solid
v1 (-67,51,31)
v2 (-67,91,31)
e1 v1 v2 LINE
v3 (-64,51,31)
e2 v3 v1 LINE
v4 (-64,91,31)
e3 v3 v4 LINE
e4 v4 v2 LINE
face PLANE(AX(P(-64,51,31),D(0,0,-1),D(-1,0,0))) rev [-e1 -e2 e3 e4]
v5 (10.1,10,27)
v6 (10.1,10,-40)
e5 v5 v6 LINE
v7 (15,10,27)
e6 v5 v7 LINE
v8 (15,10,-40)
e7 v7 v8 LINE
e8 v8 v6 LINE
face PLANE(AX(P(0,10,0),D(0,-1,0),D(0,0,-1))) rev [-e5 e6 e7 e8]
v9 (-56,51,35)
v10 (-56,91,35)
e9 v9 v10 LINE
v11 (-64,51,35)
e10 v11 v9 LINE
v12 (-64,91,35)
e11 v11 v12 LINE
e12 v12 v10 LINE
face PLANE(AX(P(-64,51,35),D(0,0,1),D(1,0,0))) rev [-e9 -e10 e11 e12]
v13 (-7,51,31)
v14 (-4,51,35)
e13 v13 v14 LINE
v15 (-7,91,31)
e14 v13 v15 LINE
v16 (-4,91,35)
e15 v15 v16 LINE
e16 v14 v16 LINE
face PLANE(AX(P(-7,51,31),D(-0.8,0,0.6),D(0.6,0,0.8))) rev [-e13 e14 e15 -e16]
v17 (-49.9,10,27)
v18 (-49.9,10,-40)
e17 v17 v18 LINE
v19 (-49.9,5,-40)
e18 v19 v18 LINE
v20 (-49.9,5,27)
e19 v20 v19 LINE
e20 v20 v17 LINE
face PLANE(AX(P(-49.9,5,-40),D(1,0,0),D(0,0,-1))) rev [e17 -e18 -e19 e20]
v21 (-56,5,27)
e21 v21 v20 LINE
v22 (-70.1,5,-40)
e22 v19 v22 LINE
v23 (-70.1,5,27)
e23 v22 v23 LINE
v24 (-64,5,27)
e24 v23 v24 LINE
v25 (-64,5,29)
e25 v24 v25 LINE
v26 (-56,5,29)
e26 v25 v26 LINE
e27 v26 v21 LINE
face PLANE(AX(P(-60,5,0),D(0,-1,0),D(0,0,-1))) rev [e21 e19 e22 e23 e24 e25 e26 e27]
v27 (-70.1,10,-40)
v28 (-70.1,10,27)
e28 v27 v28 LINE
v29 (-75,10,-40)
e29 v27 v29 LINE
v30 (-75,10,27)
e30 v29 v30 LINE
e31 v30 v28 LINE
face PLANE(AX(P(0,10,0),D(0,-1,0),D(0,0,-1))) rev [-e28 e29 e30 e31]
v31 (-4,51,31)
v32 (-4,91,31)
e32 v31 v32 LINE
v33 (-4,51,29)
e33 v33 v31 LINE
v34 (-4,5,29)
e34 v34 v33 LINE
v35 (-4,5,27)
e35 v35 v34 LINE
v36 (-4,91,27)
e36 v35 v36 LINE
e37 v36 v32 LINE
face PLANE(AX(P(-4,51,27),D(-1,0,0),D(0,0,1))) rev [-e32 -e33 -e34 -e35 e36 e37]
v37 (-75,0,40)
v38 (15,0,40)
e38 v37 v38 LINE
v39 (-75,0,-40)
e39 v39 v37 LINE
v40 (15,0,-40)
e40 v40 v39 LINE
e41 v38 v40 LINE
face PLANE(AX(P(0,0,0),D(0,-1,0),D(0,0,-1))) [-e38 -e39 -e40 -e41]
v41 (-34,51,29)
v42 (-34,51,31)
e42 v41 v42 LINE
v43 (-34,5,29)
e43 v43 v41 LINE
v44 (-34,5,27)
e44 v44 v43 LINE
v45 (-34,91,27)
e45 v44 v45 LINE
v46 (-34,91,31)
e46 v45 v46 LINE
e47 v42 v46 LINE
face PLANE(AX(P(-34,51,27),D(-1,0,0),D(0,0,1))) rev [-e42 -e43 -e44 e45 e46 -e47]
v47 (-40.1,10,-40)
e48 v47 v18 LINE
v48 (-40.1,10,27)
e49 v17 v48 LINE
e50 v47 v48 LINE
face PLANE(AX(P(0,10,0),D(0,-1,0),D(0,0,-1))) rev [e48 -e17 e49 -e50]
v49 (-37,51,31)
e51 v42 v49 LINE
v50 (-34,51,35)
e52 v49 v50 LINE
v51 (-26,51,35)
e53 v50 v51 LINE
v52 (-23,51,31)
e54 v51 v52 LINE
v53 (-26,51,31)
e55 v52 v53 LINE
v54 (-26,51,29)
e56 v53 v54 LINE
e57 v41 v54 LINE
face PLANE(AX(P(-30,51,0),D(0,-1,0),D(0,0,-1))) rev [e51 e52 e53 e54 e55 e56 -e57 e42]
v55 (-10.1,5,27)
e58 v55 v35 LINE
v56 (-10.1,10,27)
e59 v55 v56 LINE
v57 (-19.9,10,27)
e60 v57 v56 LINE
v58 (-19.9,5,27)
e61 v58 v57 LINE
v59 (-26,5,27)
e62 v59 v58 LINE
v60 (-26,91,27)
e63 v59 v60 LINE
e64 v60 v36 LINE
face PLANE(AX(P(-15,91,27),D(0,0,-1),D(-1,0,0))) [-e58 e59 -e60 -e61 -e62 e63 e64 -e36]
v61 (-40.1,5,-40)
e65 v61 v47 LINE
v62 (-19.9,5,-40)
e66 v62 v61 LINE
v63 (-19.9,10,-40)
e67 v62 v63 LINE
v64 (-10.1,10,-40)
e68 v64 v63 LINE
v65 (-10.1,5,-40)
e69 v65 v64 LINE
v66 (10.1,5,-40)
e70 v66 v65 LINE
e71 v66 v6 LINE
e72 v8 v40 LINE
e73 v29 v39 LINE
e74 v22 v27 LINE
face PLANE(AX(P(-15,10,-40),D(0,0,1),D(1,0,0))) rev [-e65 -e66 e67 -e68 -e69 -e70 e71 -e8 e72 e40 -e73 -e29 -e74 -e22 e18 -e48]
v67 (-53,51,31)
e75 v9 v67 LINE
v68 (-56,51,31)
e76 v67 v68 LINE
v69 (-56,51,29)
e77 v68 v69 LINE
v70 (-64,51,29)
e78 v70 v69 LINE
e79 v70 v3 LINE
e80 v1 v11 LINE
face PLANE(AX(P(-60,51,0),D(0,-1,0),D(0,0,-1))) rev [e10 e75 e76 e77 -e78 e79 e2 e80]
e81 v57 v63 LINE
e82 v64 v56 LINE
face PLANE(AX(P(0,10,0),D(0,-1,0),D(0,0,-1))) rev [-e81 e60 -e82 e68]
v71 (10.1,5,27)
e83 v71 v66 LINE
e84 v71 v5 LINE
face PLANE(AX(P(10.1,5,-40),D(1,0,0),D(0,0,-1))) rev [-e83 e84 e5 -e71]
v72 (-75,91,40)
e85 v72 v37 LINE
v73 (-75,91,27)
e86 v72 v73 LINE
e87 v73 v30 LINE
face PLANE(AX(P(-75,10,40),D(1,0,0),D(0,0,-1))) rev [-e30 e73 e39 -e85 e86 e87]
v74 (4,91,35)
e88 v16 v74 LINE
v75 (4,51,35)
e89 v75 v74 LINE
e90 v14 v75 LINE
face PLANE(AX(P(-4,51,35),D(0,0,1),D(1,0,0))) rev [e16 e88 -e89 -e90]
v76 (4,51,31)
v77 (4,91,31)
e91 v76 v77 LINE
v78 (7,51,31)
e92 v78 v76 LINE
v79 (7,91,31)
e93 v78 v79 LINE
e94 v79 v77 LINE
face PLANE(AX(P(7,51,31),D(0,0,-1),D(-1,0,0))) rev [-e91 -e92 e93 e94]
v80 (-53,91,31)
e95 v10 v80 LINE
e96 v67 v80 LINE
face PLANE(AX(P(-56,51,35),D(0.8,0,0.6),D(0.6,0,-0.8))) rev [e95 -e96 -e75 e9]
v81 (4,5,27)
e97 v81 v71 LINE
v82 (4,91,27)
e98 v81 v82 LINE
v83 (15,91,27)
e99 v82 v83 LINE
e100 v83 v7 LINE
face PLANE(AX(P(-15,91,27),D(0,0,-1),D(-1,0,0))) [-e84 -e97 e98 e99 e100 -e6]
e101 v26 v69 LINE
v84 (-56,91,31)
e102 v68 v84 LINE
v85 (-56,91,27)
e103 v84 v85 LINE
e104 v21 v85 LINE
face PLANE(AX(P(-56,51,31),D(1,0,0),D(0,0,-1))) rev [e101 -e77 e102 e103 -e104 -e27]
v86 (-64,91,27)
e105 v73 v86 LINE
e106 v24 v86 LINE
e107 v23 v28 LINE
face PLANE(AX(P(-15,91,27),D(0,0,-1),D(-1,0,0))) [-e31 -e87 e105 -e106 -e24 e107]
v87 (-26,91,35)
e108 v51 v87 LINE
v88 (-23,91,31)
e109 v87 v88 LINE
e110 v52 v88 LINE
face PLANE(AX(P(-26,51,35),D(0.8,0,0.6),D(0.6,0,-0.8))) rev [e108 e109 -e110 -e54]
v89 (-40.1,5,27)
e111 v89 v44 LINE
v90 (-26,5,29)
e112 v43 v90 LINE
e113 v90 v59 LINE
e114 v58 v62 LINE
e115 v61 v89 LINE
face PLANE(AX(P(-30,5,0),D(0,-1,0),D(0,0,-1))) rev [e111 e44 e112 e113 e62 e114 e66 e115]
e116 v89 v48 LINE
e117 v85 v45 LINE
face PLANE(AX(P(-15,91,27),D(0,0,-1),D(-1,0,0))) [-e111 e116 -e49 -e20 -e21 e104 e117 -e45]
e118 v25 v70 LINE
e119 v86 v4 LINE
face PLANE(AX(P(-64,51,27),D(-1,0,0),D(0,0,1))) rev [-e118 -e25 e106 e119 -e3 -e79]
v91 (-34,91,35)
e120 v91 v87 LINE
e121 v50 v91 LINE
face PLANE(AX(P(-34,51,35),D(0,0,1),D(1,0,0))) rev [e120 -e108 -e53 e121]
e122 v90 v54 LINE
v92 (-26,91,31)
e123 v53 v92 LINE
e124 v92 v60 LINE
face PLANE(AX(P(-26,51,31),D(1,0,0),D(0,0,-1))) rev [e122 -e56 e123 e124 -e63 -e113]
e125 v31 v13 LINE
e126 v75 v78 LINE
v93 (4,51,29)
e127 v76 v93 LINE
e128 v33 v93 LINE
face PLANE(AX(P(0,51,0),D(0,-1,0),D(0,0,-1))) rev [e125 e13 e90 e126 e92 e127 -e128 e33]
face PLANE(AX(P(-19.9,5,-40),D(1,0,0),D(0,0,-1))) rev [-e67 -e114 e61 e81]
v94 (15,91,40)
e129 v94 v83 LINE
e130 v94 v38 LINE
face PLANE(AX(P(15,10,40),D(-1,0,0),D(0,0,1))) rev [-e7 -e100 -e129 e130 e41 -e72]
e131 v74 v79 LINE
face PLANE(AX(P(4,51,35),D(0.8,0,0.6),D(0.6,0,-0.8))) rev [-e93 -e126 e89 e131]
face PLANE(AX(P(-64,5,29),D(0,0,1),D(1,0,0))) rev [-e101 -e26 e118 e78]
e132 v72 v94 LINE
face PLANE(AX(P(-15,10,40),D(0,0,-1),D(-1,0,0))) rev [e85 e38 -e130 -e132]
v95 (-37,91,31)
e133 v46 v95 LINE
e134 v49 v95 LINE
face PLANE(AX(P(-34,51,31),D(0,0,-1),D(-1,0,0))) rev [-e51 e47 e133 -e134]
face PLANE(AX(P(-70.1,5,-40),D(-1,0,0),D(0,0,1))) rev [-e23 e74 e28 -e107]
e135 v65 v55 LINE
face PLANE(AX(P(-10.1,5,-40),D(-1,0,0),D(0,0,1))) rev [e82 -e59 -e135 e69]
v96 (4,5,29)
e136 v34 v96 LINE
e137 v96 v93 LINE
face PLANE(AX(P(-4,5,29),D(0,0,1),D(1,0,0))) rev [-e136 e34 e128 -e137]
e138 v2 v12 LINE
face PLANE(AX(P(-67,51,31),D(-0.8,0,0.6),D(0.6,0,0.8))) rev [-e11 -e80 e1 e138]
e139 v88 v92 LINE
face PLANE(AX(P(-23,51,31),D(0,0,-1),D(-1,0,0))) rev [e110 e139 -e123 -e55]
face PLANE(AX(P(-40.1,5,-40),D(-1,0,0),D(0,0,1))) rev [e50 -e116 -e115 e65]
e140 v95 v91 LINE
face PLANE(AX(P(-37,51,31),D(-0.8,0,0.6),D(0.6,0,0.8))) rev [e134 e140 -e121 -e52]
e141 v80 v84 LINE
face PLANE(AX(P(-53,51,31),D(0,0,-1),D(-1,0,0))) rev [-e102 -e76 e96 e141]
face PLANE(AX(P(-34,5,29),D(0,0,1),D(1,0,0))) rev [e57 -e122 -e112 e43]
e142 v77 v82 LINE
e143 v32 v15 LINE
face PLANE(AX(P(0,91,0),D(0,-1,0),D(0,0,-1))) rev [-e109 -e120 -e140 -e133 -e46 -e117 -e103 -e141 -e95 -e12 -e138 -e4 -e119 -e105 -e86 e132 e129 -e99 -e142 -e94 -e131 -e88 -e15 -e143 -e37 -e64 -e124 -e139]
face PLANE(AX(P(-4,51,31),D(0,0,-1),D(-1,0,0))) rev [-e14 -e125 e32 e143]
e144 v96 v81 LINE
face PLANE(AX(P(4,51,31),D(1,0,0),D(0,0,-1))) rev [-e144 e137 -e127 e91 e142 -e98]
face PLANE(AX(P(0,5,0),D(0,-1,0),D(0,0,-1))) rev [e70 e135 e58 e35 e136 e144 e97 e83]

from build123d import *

# Parameters (mm, degrees)
SKETCH1_W           = 30
SKETCH1_H           = 80
BOSS_EXTRUDE1_DEPTH = 10
SKETCH2_W           = 30
SKETCH2_H           = 13
BOSS_EXTRUDE2_DEPTH = 81
CUT_EXTRUDE1_DEPTH  = 40
SKETCH4_W           = 20.2
SKETCH4_H           = 67
CUT_EXTRUDE2_DEPTH  = 5
SKETCH5_W           = 8
SKETCH5_H           = 2
CUT_EXTRUDE3_DEPTH  = 46
LPATTERN1_COUNT     = 3
LPATTERN1_PITCH     = 30


with BuildPart() as part:
    # Sketch1 → Boss-Extrude1 (new body)
    with BuildSketch(Plane(origin=(0, 0, 0), x_dir=(1, 0, 0), z_dir=(0, 1, 0))):
        Rectangle(SKETCH1_W, SKETCH1_H)
    boss_extrude1 = extrude(amount=BOSS_EXTRUDE1_DEPTH)

    # Sketch2 → Boss-Extrude2 (add)
    with BuildSketch(Plane(origin=(0, 10, 0), x_dir=(1, 0, 0), z_dir=(0, 1, 0))):
        with Locations((0, -33.5)):
            Rectangle(SKETCH2_W, SKETCH2_H)
    boss_extrude2 = extrude(amount=BOSS_EXTRUDE2_DEPTH)

    # Sketch3 → Cut-Extrude1 (cut)
    with BuildSketch(Plane(origin=(0, 91, 0), x_dir=(1, 0, 0), z_dir=(0, 1, 0))):
        Polygon((-4, -27), (4, -27), (4, -31), (7, -31), (4, -35), (-4, -35), (-7, -31), (-4, -31), align=None)
    cut_extrude1 = extrude(amount=-CUT_EXTRUDE1_DEPTH, mode=Mode.SUBTRACT)

    # Sketch4 → Cut-Extrude2 (cut)
    with BuildSketch(Plane(origin=(0, 10, 0), x_dir=(1, 0, 0), z_dir=(0, 1, 0))):
        with Locations((0, 6.5)):
            Rectangle(SKETCH4_W, SKETCH4_H)
    cut_extrude2 = extrude(amount=-CUT_EXTRUDE2_DEPTH, mode=Mode.SUBTRACT)

    # Sketch5 → Cut-Extrude3 (cut)
    with BuildSketch(Plane(origin=(0, 51, 0), x_dir=(1, 0, 0), z_dir=(0, 1, 0))):
        with Locations((0, -28)):
            Rectangle(SKETCH5_W, SKETCH5_H)
    cut_extrude3 = extrude(amount=-CUT_EXTRUDE3_DEPTH, mode=Mode.SUBTRACT)

    # LPattern1: Boss-Extrude1, Boss-Extrude2, Cut-Extrude1, Cut-Extrude2, Cut-Extrude3 ×3
    with Locations(*[(-i * LPATTERN1_PITCH, 0, 0) for i in range(1, LPATTERN1_COUNT)]):
        add(boss_extrude1)
        add(boss_extrude2)
        add(cut_extrude1, mode=Mode.SUBTRACT)
        add(cut_extrude2, mode=Mode.SUBTRACT)
        add(cut_extrude3, mode=Mode.SUBTRACT)


solid = part.part
